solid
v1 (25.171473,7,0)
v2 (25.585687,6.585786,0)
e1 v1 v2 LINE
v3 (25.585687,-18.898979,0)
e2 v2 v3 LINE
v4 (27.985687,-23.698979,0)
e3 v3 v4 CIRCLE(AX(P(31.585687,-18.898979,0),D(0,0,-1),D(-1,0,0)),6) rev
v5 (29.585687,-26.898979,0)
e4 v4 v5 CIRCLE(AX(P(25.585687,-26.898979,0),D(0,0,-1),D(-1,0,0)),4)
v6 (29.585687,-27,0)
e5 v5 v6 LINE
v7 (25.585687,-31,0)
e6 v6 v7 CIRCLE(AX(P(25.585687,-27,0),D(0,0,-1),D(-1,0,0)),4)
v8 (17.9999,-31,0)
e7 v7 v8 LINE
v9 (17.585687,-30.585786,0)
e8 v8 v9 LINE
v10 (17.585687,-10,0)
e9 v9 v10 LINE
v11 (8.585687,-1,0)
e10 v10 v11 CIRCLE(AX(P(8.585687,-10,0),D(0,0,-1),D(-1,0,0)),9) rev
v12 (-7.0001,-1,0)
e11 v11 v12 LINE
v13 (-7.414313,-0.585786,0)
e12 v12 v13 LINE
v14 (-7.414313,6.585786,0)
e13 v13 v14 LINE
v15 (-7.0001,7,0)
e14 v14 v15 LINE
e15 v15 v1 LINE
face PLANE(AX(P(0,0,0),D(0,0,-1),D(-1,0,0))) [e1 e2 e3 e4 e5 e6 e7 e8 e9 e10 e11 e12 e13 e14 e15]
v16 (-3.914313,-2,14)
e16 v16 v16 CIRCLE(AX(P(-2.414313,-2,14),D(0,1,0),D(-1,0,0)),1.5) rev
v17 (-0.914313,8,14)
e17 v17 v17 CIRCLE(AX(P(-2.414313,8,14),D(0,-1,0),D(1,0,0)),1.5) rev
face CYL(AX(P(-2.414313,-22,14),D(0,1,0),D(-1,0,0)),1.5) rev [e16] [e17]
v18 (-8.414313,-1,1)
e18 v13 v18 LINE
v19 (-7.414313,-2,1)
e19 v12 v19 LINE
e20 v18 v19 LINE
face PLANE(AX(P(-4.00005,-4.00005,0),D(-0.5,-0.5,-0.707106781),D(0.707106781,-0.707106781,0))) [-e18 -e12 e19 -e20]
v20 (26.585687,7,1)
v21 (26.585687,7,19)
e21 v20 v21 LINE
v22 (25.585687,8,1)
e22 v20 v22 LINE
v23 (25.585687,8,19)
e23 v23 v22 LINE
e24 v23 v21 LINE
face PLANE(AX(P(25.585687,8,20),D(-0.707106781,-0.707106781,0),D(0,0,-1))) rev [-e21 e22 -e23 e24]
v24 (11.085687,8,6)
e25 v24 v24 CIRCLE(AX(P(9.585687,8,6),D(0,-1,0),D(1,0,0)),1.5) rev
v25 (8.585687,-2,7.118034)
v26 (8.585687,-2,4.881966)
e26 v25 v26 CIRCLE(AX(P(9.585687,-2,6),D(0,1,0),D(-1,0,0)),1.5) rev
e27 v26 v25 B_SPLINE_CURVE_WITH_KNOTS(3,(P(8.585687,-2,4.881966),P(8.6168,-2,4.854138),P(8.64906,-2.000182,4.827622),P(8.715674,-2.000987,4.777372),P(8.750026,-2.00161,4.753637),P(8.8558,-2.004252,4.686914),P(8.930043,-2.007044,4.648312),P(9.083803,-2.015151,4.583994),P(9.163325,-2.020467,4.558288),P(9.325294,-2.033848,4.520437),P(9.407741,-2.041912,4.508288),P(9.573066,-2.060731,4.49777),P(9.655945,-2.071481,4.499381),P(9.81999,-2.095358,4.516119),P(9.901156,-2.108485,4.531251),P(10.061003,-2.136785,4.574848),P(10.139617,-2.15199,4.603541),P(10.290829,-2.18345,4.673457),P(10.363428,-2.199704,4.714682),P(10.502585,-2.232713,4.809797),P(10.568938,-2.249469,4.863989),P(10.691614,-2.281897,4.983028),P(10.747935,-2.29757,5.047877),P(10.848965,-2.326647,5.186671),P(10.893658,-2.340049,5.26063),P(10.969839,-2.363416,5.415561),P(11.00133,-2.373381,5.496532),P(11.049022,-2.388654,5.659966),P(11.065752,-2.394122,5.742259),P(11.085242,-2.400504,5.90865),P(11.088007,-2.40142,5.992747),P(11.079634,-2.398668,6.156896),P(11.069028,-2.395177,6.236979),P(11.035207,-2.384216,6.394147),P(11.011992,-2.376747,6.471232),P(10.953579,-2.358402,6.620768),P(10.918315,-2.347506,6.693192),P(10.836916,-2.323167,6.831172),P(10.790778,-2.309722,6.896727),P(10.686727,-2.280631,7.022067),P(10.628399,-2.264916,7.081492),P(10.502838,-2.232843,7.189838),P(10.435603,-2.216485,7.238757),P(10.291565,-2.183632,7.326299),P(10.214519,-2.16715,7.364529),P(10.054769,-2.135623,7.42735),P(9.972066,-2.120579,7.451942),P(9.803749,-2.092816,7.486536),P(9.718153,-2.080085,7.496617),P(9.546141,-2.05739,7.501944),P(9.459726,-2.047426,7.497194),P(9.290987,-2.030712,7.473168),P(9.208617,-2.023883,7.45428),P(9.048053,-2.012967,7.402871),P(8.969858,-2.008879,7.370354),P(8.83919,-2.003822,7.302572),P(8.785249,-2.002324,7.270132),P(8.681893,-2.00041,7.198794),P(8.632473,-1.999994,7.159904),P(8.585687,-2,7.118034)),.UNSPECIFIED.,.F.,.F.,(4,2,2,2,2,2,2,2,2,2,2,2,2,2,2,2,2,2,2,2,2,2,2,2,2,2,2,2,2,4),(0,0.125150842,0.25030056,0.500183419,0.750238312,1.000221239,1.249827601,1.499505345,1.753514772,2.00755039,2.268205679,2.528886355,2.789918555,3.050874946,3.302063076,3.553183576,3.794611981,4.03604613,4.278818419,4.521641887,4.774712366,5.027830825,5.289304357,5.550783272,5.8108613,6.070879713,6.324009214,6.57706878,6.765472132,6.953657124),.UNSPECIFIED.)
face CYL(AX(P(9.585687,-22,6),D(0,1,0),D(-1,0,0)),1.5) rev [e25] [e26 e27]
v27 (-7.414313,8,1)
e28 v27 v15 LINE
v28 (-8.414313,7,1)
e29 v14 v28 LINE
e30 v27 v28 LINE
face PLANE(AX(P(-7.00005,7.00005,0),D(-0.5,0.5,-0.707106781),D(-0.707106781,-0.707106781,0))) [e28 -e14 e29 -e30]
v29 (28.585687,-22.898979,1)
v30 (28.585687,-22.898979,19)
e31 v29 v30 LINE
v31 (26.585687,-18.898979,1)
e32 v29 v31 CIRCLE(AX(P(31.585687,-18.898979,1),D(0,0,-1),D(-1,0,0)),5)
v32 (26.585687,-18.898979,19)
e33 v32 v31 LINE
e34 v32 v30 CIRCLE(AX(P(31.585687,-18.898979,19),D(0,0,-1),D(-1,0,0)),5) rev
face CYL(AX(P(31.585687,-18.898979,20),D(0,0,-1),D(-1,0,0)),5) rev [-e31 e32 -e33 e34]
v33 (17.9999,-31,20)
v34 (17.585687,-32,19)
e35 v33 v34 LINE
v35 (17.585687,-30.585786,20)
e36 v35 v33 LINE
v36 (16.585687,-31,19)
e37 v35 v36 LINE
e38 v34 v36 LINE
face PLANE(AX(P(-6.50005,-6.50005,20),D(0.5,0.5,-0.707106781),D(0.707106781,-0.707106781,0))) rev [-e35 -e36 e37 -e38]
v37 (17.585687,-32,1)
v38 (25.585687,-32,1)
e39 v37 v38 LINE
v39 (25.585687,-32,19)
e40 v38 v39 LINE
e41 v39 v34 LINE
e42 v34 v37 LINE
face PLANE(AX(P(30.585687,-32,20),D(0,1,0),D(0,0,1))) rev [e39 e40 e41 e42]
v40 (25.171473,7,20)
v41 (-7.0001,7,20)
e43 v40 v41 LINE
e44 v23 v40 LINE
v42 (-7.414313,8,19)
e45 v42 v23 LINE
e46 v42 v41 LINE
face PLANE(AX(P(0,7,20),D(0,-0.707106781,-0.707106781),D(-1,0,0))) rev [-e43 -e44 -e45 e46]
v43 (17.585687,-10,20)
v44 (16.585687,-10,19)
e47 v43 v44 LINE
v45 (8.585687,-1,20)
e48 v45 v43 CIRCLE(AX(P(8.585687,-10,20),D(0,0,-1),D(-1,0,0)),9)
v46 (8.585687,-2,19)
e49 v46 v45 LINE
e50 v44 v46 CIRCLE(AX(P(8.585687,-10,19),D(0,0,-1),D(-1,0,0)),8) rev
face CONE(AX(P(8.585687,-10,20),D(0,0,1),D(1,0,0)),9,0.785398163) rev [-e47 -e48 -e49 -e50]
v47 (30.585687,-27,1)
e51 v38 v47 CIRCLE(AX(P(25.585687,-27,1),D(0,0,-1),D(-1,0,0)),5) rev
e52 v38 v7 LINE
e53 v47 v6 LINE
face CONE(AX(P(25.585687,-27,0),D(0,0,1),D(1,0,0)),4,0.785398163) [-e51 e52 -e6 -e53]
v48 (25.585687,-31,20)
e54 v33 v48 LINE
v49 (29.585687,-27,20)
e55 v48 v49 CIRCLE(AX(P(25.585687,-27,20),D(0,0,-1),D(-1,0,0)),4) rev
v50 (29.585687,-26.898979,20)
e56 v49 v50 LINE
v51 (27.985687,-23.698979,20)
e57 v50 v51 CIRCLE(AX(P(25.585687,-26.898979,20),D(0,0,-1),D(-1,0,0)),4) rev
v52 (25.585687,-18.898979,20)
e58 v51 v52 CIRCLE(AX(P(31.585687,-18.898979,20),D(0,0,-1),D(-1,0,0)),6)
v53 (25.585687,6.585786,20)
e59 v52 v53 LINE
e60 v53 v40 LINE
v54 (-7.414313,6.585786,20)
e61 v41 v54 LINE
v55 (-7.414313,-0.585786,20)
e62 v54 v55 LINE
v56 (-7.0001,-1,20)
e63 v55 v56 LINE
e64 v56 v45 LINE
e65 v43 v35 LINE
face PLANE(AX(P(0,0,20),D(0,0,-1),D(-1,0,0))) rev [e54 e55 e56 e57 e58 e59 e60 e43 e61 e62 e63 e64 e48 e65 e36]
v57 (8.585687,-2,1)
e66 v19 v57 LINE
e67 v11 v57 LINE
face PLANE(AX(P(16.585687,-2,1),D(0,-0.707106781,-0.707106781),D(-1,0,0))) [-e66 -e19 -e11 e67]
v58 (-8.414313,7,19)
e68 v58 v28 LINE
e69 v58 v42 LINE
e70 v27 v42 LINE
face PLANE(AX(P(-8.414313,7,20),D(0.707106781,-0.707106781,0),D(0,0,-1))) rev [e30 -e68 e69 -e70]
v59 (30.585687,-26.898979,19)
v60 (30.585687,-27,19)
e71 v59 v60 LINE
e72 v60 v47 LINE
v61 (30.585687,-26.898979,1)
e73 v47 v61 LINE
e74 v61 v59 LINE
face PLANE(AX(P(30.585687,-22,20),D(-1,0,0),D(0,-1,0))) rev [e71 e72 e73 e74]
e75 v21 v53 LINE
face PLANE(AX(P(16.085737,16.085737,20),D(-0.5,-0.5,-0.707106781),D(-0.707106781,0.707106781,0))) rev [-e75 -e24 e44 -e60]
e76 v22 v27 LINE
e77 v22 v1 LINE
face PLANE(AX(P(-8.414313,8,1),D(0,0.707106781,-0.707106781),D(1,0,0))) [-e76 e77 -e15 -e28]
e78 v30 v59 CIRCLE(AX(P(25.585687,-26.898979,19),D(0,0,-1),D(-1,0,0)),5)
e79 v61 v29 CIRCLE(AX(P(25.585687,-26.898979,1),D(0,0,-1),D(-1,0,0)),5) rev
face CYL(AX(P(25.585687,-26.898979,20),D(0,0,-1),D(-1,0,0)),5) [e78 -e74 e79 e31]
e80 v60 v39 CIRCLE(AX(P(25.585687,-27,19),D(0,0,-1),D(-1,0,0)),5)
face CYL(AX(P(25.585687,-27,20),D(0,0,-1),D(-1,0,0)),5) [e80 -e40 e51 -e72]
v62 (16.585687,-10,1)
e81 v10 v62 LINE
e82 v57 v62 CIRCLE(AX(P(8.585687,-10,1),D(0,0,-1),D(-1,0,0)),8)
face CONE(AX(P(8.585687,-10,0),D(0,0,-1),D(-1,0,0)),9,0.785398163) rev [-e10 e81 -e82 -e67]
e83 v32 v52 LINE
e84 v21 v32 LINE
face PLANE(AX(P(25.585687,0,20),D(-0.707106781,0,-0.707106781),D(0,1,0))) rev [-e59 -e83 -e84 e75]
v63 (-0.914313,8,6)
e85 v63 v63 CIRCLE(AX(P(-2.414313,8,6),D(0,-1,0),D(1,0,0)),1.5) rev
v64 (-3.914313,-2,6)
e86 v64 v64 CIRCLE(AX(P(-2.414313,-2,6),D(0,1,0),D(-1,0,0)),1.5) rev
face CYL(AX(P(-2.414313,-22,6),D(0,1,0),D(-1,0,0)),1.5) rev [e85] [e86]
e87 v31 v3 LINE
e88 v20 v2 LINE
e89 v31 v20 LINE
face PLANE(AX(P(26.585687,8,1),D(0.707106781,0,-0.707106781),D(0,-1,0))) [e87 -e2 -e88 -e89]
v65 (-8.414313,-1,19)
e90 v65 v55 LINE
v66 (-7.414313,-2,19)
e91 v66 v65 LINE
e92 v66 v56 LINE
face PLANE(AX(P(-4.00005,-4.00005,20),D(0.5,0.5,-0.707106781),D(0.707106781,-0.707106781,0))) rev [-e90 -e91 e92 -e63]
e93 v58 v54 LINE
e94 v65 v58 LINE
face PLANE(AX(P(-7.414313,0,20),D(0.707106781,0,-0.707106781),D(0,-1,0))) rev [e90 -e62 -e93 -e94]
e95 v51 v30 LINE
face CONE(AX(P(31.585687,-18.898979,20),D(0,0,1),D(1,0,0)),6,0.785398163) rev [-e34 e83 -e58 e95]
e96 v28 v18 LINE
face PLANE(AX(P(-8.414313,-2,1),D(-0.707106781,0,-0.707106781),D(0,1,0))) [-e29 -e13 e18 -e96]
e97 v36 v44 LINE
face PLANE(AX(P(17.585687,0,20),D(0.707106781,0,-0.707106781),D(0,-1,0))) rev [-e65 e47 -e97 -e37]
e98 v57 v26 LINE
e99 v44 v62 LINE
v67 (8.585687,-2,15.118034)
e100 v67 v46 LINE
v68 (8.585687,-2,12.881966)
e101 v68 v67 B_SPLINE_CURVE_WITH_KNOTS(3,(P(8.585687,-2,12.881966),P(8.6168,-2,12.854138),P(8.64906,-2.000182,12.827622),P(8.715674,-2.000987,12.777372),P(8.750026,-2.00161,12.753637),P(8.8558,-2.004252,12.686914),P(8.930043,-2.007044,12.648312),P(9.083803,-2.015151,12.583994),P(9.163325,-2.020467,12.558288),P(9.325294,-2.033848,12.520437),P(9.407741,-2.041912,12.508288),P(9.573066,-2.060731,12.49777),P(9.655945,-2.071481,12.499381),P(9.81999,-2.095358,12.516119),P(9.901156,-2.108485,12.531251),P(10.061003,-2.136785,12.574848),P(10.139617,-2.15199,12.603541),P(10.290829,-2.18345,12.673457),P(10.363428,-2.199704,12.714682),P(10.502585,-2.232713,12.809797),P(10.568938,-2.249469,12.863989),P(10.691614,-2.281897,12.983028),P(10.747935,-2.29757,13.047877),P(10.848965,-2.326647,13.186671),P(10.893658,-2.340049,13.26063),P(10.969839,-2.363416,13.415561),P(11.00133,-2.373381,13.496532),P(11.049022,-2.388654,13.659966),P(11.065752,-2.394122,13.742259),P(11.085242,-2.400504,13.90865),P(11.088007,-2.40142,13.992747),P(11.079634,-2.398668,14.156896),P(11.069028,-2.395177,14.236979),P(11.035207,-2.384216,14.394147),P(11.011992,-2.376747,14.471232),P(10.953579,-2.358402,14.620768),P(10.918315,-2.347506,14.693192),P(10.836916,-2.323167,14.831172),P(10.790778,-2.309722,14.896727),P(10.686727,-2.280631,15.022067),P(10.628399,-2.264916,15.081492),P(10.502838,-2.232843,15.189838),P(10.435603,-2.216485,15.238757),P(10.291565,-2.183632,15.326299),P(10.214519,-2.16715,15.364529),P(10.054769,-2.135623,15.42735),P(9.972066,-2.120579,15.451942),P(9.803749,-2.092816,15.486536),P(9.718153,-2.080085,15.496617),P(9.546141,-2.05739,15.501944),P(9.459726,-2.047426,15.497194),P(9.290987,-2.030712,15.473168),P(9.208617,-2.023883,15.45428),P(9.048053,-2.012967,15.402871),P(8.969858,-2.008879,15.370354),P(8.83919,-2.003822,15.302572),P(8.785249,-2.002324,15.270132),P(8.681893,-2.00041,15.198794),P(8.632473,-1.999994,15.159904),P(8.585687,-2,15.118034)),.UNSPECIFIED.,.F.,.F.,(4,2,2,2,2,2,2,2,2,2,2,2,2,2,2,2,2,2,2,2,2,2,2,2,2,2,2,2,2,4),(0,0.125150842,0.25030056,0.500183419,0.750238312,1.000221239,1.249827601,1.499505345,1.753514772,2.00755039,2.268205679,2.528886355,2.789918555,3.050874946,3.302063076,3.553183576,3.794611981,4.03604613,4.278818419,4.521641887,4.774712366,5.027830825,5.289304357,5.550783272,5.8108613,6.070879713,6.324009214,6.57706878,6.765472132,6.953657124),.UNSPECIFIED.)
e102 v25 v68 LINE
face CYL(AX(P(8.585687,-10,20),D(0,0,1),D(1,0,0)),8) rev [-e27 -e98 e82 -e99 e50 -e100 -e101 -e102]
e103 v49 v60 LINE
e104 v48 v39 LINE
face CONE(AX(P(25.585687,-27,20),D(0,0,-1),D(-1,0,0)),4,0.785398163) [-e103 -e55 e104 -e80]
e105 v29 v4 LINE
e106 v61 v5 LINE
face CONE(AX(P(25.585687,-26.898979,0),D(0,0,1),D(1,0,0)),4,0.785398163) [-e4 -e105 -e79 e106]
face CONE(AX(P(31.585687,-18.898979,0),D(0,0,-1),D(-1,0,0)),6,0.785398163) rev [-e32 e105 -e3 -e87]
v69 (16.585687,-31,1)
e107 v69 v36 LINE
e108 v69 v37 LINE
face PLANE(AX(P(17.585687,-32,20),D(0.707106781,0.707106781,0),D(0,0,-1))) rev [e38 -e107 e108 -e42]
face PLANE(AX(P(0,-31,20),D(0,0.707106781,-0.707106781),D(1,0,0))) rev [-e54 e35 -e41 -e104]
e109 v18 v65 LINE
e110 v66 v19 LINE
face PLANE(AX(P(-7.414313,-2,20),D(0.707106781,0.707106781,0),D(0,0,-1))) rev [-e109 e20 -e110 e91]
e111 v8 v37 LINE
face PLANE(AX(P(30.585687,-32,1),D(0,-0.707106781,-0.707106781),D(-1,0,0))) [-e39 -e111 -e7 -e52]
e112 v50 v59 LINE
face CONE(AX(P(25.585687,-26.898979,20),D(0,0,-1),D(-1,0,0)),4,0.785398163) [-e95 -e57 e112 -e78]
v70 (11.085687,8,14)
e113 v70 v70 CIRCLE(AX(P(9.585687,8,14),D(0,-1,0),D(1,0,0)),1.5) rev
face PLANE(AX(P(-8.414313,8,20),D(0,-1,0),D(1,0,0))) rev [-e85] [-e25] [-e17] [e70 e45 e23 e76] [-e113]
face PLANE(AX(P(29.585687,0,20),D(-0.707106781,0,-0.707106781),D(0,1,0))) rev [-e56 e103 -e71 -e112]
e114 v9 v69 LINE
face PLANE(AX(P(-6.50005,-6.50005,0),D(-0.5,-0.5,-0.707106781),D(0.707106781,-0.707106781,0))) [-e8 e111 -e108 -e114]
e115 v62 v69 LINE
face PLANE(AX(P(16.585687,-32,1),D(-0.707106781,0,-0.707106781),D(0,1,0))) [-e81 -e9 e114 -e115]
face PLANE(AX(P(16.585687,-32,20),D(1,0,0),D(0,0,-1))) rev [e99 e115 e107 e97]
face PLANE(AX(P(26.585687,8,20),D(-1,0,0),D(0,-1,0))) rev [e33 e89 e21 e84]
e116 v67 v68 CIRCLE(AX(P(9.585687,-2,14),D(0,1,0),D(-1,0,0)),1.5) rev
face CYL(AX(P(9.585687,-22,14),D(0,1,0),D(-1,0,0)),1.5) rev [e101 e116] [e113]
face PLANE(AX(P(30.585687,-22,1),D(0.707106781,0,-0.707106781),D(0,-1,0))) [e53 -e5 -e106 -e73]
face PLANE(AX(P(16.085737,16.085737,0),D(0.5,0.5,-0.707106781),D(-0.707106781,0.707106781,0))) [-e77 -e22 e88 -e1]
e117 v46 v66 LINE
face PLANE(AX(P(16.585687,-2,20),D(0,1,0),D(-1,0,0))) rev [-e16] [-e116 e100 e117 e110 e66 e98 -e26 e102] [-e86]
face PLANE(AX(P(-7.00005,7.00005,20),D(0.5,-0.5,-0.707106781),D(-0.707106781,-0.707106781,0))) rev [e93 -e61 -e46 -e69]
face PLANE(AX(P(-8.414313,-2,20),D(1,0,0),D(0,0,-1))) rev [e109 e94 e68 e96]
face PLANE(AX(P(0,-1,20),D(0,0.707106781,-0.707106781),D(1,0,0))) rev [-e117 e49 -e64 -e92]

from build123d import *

# Parameters (mm, degrees)
EXTRUDE_3_DEPTH          = 20
FILLET_3_R               = 5
FILLET_4_R               = 5
FILLET_5_R               = 8
CUT_EXTRUDE_1_DEPTH      = 20
CUT_EXTRUDE_1_DEPTH_BACK = 20
SKETCH_6_R               = 1.5
CHAMFER_1_SIZE           = 1
CHAMFER_2_SIZE           = 1


with BuildPart() as part:
    # 草图5 → 凸台-拉伸3 (new body)
    with BuildSketch(Plane.XY):
        Polygon((-8.414313081, 8), (26.585686919, 8), (26.585686919, -22), (30.585686919, -22), (30.585686919, -32), (16.585686919, -32), (16.585686919, -2), (-8.414313081, -2), align=None)
    extrude(amount=EXTRUDE_3_DEPTH)

    # 圆角3
    # the kernel refuses this fillet: 5 mm, written as the material it takes off along each edge
    with BuildSketch(Plane(origin=(30.585686919, -32, -12.5), x_dir=(0, 1, 0), z_dir=(0, 0, 1))) as fillet_3_piece_1:
        with BuildLine():
            CenterArc((FILLET_3_R, FILLET_3_R), FILLET_3_R, 180, 90)
            Line((0, FILLET_3_R), (-FILLET_3_R * 0.02, FILLET_3_R))
            Line((-FILLET_3_R * 0.02, FILLET_3_R), (-FILLET_3_R * 0.02, -FILLET_3_R * 0.02))
            Line((-FILLET_3_R * 0.02, -FILLET_3_R * 0.02), (FILLET_3_R, -FILLET_3_R * 0.02))
            Line((FILLET_3_R, -FILLET_3_R * 0.02), (FILLET_3_R, 0))
        make_face()
    extrude(amount=45, mode=Mode.SUBTRACT)
    with BuildSketch(Plane(origin=(30.585686919, -22, -12.247448714), x_dir=(-1.0, -1.569411267609618e-12, 0), z_dir=(0, 0, 1))) as fillet_3_piece_2:
        with BuildLine():
            CenterArc((5, 4.898979486), FILLET_3_R, 180, 78.463040967)
            Line((0, 4.898979486), (-0.1, 4.898979486))
            Line((-0.1, 4.898979486), (-0.1, 0))
            Line((-0.1, 0), (0, -0.1))
            ThreePointArc((0, -0.1), (2, -0.1), (3.98, -0.09797959))
            Line((3.98, -0.09797959), (4, 0))
        make_face()
    extrude(amount=44.494897428, mode=Mode.SUBTRACT)

    # 圆角4
    fillet_4_edges = [part.edges().sort_by_distance(p)[0] for p in [
        (26.585686919, -22, 10),
    ]]
    fillet(fillet_4_edges, radius=FILLET_4_R)

    # 圆角5
    fillet_5_edges = [part.edges().sort_by_distance(p)[0] for p in [
        (16.585686919, -2, 10),
    ]]
    fillet(fillet_5_edges, radius=FILLET_5_R)

    # 草图6 → 切除-拉伸1 (cut, two sides: drawn at the far end of the back side and taken through both)
    with BuildSketch(Plane(origin=(0, -2, 0), x_dir=(-1, 0, 0), z_dir=(0, -1, 0)).offset(-CUT_EXTRUDE_1_DEPTH_BACK)):
        with Locations((2.414313081, -14)):
            Circle(SKETCH_6_R)
        with Locations((2.414313081, -6)):
            Circle(SKETCH_6_R)
        with Locations(Location((-9.585686919, -6, 0), (0, 0, 48.189685104))):
            Circle(SKETCH_6_R)
        with Locations(Location((-9.585686919, -14, 0), (0, 0, 48.189685104))):
            Circle(SKETCH_6_R)
    extrude(amount=CUT_EXTRUDE_1_DEPTH + CUT_EXTRUDE_1_DEPTH_BACK, mode=Mode.SUBTRACT)

    # 倒角1
    chamfer_1_edges = [part.edges().sort_by_distance(p)[0] for p in [
        (-8.414313081, 8, 10),
        (26.585686919, 8, 10),
        (16.585686919, -32, 10),
        (-8.414313081, -2, 10),
    ]]
    chamfer(chamfer_1_edges, length=CHAMFER_1_SIZE)

    # 倒角2
    chamfer_2_edges = [part.edges().sort_by_distance(p)[0] for p in [
        (30.585686919, -26.949489743, 0),
        (30.585686919, -26.949489743, 20),
        (29.121220825, -30.535533906, 0),
        (30.057822874, -24.662911508, 20),
        (29.121220825, -30.535533906, 20),
        (26.585686919, -5.949489743, 0),
        (26.585686919, -5.949489743, 20),
        (30.057822874, -24.662911508, 0),
        (27.113550964, -21.135047463, 0),
        (27.113550964, -21.135047463, 20),
        (16.585686919, -20.5, 0),
        (16.585686919, -20.5, 20),
        (14.242541169, -4.343145751, 0),
        (14.242541169, -4.343145751, 20),
        (9.085686919, 8, 0),
        (9.085686919, 8, 20),
        (21.585686919, -32, 0),
        (0.585686919, -2, 0),
        (-8.414313081, 3, 0),
        (17.085686919, -31.5, 0),
        (-7.914313081, -1.5, 0),
        (-7.914313081, 7.5, 0),
        (26.085686919, 7.5, 0),
        (21.585686919, -32, 20),
        (-8.414313081, 3, 20),
        (0.585686919, -2, 20),
        (17.085686919, -31.5, 20),
        (-7.914313081, -1.5, 20),
        (-7.914313081, 7.5, 20),
        (26.085686919, 7.5, 20),
    ]]
    chamfer(chamfer_2_edges, length=CHAMFER_2_SIZE)


solid = part.part
